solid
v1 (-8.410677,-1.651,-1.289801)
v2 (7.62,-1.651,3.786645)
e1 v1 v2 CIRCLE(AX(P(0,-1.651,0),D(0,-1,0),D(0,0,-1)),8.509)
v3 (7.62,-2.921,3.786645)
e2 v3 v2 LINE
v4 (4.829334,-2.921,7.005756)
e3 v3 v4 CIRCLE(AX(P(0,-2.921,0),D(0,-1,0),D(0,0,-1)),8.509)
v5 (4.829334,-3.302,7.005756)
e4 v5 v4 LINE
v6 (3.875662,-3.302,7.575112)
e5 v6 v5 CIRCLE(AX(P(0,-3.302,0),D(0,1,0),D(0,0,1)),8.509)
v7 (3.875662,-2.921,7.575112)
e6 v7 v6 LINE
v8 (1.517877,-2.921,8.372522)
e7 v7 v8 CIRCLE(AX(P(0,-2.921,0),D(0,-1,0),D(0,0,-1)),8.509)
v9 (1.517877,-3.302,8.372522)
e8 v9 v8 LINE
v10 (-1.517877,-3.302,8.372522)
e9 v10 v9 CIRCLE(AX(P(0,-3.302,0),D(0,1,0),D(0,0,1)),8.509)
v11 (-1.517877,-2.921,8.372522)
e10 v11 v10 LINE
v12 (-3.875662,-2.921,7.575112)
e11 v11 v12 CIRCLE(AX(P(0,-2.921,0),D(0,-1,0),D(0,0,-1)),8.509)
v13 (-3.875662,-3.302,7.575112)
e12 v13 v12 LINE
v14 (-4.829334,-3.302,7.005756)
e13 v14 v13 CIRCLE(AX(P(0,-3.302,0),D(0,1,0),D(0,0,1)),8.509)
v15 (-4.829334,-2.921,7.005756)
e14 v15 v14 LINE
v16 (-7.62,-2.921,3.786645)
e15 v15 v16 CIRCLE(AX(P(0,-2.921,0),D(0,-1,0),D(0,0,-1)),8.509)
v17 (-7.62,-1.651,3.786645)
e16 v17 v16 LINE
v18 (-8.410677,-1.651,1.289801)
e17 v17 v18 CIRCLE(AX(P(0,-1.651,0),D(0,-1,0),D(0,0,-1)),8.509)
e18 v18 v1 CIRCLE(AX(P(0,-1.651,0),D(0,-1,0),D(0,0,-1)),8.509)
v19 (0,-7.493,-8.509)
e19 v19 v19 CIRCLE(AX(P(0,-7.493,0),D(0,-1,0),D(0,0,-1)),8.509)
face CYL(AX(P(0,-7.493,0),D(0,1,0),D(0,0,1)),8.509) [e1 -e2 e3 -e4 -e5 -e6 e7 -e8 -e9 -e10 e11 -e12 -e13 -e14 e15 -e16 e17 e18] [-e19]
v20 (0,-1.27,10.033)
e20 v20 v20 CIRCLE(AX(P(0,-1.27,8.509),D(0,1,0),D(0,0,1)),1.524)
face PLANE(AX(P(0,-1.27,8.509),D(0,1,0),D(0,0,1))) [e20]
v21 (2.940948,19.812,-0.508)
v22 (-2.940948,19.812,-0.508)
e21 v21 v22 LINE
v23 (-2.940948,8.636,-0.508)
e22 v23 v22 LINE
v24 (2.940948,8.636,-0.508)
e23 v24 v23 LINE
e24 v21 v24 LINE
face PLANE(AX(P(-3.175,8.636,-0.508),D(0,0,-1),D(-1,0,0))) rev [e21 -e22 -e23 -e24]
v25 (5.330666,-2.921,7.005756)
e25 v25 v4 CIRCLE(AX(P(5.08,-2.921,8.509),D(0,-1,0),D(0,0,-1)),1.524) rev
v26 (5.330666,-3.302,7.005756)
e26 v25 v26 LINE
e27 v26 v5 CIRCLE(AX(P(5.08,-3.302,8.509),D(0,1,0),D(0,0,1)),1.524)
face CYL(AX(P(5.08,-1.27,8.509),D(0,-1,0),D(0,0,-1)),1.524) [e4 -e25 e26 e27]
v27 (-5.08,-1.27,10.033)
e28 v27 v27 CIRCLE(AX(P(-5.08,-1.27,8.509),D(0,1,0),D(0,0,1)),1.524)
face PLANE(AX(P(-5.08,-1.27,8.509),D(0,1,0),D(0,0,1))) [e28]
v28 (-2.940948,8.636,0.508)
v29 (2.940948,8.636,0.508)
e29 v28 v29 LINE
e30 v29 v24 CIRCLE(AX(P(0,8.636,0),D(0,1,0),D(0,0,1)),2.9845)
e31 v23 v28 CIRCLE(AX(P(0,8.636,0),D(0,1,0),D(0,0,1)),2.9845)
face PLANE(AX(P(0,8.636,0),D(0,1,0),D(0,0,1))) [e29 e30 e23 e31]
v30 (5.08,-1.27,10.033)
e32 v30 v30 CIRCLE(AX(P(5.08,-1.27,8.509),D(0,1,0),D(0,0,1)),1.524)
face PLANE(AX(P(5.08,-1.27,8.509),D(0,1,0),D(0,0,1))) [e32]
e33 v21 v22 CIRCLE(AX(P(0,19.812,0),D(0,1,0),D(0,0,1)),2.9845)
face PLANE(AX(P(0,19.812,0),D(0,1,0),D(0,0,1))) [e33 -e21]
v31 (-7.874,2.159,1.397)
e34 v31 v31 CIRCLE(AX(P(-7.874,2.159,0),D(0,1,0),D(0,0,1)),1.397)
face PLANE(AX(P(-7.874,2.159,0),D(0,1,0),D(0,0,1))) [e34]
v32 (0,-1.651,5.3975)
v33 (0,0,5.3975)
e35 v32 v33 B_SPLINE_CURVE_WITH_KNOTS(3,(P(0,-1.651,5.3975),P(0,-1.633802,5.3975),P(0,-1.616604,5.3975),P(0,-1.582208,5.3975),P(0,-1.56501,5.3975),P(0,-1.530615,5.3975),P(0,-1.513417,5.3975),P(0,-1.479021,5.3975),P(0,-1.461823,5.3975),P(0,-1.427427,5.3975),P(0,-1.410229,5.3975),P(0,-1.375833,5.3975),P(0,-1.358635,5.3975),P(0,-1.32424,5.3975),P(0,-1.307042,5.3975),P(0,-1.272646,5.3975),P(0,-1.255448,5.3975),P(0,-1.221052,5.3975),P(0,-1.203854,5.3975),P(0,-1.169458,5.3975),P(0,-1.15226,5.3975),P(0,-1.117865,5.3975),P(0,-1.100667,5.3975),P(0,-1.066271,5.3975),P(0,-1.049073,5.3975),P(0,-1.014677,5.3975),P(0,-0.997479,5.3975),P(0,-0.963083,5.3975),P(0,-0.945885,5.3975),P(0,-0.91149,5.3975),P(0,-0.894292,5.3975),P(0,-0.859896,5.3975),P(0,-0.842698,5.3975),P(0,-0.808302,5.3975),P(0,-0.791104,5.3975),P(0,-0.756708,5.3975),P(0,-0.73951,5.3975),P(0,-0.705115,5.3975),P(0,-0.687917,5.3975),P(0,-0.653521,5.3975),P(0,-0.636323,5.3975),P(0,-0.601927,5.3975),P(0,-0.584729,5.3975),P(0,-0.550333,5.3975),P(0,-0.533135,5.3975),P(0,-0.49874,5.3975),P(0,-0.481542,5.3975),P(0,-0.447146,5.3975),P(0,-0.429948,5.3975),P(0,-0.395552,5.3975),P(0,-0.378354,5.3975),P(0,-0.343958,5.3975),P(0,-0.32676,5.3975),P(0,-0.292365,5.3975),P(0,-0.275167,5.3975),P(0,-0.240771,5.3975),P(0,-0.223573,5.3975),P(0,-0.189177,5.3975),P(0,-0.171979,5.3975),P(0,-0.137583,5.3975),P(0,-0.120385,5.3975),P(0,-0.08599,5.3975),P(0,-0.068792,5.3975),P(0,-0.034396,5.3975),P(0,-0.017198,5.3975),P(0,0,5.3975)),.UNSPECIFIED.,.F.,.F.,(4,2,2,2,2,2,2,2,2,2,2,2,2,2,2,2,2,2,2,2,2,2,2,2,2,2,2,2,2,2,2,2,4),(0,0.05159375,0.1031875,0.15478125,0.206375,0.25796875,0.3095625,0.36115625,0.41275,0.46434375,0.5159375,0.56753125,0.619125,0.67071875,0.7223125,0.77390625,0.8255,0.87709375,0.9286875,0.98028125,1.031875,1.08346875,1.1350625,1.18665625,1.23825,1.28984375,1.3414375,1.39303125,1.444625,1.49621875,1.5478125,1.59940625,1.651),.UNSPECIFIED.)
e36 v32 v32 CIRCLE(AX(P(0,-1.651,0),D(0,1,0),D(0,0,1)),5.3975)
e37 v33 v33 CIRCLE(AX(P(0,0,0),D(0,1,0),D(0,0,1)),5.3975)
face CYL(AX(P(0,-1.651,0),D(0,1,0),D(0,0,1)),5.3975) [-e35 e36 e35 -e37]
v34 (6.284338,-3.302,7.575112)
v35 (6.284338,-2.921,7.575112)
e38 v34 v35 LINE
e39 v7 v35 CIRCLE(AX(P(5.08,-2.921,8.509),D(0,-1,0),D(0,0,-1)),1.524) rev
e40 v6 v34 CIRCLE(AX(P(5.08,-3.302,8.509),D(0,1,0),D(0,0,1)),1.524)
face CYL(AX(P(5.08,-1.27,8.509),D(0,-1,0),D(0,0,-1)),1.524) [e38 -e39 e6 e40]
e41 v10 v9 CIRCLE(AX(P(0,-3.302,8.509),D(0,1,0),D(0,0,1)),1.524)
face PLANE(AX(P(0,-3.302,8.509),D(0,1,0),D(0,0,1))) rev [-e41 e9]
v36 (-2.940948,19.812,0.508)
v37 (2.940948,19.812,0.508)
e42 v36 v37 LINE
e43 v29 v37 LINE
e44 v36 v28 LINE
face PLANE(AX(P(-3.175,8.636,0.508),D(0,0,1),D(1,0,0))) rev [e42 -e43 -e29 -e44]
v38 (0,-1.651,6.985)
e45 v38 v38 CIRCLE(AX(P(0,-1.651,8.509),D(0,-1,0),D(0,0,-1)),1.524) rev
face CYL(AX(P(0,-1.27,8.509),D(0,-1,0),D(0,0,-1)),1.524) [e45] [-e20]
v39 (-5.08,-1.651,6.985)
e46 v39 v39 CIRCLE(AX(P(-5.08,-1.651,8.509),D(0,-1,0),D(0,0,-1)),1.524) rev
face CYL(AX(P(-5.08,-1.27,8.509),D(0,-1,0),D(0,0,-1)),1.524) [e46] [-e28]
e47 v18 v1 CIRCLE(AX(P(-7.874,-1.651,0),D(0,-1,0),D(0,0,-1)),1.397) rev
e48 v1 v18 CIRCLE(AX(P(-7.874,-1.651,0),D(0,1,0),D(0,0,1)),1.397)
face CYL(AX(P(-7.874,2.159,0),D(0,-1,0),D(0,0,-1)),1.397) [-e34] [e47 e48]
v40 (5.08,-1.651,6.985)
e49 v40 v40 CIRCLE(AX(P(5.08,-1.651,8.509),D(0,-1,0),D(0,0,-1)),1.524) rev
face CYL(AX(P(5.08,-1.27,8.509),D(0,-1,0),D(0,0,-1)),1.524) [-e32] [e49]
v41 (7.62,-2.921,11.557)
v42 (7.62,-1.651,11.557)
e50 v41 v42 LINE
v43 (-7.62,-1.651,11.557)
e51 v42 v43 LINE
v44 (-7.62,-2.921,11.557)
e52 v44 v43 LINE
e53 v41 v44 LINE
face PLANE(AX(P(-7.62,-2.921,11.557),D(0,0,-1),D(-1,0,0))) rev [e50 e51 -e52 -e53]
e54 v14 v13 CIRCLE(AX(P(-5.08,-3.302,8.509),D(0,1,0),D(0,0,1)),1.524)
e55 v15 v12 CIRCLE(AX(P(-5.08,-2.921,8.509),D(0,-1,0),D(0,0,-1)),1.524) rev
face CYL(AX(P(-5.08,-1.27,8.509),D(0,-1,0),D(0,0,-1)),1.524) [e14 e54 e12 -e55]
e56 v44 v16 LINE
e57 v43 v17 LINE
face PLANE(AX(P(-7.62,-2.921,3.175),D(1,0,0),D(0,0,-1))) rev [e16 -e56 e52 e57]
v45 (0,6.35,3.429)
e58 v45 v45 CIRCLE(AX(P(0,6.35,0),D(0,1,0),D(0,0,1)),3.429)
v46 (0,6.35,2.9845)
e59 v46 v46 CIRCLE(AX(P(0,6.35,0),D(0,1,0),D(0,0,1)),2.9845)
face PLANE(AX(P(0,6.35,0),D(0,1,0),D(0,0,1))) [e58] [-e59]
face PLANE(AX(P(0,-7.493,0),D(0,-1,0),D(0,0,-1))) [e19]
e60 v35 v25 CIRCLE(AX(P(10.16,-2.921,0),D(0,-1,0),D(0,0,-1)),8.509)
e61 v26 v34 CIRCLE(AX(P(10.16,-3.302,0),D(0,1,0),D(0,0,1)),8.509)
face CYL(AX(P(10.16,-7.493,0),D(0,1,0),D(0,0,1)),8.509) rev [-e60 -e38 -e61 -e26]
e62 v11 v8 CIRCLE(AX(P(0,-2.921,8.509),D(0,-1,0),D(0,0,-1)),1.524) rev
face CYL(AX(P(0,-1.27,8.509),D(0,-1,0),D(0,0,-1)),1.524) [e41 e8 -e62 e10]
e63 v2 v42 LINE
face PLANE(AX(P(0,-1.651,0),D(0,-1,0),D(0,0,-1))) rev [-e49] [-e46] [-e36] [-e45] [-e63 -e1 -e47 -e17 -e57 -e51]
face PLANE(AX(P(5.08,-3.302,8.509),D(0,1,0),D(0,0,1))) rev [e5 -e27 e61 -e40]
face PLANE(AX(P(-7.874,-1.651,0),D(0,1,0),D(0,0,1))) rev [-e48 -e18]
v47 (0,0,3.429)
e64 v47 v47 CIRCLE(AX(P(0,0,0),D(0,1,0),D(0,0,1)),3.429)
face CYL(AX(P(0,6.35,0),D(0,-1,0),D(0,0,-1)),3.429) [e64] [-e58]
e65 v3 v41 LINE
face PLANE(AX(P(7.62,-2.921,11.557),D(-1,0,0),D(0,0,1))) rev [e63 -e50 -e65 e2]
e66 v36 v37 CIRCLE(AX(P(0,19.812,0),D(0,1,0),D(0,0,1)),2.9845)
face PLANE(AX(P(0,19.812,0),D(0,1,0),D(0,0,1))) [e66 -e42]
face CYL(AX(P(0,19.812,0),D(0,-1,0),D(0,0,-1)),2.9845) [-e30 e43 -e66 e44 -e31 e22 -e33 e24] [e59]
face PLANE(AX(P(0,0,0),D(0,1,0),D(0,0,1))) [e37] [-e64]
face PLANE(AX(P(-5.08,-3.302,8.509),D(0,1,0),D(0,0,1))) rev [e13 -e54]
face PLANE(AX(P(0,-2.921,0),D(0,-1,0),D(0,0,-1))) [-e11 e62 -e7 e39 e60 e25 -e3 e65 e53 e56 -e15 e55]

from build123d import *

# Parameters (mm, degrees)
SKETCH1_R            = 5.3975
BOSS_EXTRUDE1_DEPTH  = 1.651
SKETCH2_R            = 8.509
BOSS_EXTRUDE2_DEPTH  = 5.842
SKETCH3_R            = 3.429
BOSS_EXTRUDE3_DEPTH  = 6.35
SKETCH6_R            = 2.9845
BOSS_EXTRUDE5_DEPTH  = 13.462
SKETCH12_W           = 6.35
SKETCH12_H           = 1.016
CUT_EXTRUDE1_DEPTH   = 11.176
BOSS_EXTRUDE7_DEPTH  = 1.27
SKETCH14_R           = 1.524
BOSS_EXTRUDE11_DEPTH = 1.016
LPATTERN2_START      = -3.302
LPATTERN2_OUTLINE_R  = 1.524
LPATTERN2_DEPTH      = 2.032
LPATTERN2_START_2    = -1.651
LPATTERN2_2_DEPTH    = 0.381
SKETCH4_R            = 1.397
BOSS_EXTRUDE8_DEPTH  = 3.81


# Read off the part's stored shape, not the designer's step: LPattern2
with BuildPart() as part:
    # Sketch1 → Boss-Extrude1 (new body)
    with BuildSketch(Plane(origin=(0, 0, 0), x_dir=(1, 0, 0), z_dir=(0, 1, 0))):
        with Locations(Location((0, 0, 0), (0, 0, 270))):
            Circle(SKETCH1_R)
    extrude(amount=-BOSS_EXTRUDE1_DEPTH)

    # Sketch2 → Boss-Extrude2 (add)
    with BuildSketch(Plane.XZ.offset(1.651)):
        with Locations(Location((0, 0, 0), (0, 0, 270))):
            Circle(SKETCH2_R)
    extrude(amount=BOSS_EXTRUDE2_DEPTH)

    # Sketch3 → Boss-Extrude3 (add)
    with BuildSketch(Plane(origin=(0, 0, 0), x_dir=(1, 0, 0), z_dir=(0, 1, 0))):
        with Locations(Location((0, 0, 0), (0, 0, 270))):
            Circle(SKETCH3_R)
    extrude(amount=BOSS_EXTRUDE3_DEPTH)

    # Sketch6 → Boss-Extrude5 (add)
    with BuildSketch(Plane(origin=(0, 6.35, 0), x_dir=(1, 0, 0), z_dir=(0, 1, 0))):
        with Locations(Location((0, 0, 0), (0, 0, 270))):
            Circle(SKETCH6_R)
    extrude(amount=BOSS_EXTRUDE5_DEPTH)

    # Sketch12 → Cut-Extrude1 (cut)
    with BuildSketch(Plane(origin=(0, 19.812, 0), x_dir=(1, 0, 0), z_dir=(0, 1, 0))):
        Rectangle(SKETCH12_W, SKETCH12_H)
    extrude(amount=-CUT_EXTRUDE1_DEPTH, mode=Mode.SUBTRACT)

    # Sketch11 → Boss-Extrude7 (add)
    with BuildSketch(Plane.XZ.offset(1.651)):
        with BuildLine():
            Line((-7.62, 3.175), (-7.62, 11.557))
            Line((-7.62, 11.557), (7.62, 11.557))
            Line((7.62, 11.557), (7.62, 3.175))
            ThreePointArc((7.62, 3.175), (0, -8.255), (-7.62, 3.175))
        make_face()
    extrude(amount=BOSS_EXTRUDE7_DEPTH)

    # Sketch14 → Boss-Extrude11 (add, symmetric)
    with BuildSketch(Plane(origin=(0, -2.286, 0), x_dir=(1, 0, 0), z_dir=(0, 1, 0))):
        with Locations(Location((-5.08, -8.509, 0), (0, 0, 90))):
            Circle(SKETCH14_R)
    extrude(amount=BOSS_EXTRUDE11_DEPTH, both=True)

    # LPattern2 outline → LPattern2 (add)
    with BuildSketch(Plane(origin=(0, 0, 0), x_dir=(1, 0, 0), z_dir=(0, 1, 0)).offset(LPATTERN2_START)):
        with Locations((0, -8.509)):
            Circle(LPATTERN2_OUTLINE_R)
        with BuildLine():
            ThreePointArc((5.330666391, -7.005756054), (4.298782485, -9.817539336), (6.284337715, -7.575112069))
            ThreePointArc((6.284337715, -7.575112069), (5.798202212, -7.306011296), (5.330666391, -7.005756054))
        make_face()
    extrude(amount=LPATTERN2_DEPTH)

    # LPattern2 2 outline → LPattern2 2 (add)
    with BuildSketch(Plane(origin=(0, 0, 0), x_dir=(1, 0, 0), z_dir=(0, 1, 0)).offset(LPATTERN2_START_2)):
        with BuildLine():
            ThreePointArc((5.330666391, -7.005756054), (5.798202212, -7.306011296), (6.284337715, -7.575112069))
            ThreePointArc((6.284337715, -7.575112069), (5.861217515, -7.200460664), (5.330666391, -7.005756054))
        make_face()
    extrude(amount=LPATTERN2_2_DEPTH)

    # Sketch4 → Boss-Extrude8 (add)
    with BuildSketch(Plane(origin=(0, -1.651, 0), x_dir=(1, 0, 0), z_dir=(0, 1, 0))):
        with Locations(Location((-7.874, 0, 0), (0, 0, 112.591863996))):
            Circle(SKETCH4_R)
    extrude(amount=BOSS_EXTRUDE8_DEPTH)


solid = part.part
